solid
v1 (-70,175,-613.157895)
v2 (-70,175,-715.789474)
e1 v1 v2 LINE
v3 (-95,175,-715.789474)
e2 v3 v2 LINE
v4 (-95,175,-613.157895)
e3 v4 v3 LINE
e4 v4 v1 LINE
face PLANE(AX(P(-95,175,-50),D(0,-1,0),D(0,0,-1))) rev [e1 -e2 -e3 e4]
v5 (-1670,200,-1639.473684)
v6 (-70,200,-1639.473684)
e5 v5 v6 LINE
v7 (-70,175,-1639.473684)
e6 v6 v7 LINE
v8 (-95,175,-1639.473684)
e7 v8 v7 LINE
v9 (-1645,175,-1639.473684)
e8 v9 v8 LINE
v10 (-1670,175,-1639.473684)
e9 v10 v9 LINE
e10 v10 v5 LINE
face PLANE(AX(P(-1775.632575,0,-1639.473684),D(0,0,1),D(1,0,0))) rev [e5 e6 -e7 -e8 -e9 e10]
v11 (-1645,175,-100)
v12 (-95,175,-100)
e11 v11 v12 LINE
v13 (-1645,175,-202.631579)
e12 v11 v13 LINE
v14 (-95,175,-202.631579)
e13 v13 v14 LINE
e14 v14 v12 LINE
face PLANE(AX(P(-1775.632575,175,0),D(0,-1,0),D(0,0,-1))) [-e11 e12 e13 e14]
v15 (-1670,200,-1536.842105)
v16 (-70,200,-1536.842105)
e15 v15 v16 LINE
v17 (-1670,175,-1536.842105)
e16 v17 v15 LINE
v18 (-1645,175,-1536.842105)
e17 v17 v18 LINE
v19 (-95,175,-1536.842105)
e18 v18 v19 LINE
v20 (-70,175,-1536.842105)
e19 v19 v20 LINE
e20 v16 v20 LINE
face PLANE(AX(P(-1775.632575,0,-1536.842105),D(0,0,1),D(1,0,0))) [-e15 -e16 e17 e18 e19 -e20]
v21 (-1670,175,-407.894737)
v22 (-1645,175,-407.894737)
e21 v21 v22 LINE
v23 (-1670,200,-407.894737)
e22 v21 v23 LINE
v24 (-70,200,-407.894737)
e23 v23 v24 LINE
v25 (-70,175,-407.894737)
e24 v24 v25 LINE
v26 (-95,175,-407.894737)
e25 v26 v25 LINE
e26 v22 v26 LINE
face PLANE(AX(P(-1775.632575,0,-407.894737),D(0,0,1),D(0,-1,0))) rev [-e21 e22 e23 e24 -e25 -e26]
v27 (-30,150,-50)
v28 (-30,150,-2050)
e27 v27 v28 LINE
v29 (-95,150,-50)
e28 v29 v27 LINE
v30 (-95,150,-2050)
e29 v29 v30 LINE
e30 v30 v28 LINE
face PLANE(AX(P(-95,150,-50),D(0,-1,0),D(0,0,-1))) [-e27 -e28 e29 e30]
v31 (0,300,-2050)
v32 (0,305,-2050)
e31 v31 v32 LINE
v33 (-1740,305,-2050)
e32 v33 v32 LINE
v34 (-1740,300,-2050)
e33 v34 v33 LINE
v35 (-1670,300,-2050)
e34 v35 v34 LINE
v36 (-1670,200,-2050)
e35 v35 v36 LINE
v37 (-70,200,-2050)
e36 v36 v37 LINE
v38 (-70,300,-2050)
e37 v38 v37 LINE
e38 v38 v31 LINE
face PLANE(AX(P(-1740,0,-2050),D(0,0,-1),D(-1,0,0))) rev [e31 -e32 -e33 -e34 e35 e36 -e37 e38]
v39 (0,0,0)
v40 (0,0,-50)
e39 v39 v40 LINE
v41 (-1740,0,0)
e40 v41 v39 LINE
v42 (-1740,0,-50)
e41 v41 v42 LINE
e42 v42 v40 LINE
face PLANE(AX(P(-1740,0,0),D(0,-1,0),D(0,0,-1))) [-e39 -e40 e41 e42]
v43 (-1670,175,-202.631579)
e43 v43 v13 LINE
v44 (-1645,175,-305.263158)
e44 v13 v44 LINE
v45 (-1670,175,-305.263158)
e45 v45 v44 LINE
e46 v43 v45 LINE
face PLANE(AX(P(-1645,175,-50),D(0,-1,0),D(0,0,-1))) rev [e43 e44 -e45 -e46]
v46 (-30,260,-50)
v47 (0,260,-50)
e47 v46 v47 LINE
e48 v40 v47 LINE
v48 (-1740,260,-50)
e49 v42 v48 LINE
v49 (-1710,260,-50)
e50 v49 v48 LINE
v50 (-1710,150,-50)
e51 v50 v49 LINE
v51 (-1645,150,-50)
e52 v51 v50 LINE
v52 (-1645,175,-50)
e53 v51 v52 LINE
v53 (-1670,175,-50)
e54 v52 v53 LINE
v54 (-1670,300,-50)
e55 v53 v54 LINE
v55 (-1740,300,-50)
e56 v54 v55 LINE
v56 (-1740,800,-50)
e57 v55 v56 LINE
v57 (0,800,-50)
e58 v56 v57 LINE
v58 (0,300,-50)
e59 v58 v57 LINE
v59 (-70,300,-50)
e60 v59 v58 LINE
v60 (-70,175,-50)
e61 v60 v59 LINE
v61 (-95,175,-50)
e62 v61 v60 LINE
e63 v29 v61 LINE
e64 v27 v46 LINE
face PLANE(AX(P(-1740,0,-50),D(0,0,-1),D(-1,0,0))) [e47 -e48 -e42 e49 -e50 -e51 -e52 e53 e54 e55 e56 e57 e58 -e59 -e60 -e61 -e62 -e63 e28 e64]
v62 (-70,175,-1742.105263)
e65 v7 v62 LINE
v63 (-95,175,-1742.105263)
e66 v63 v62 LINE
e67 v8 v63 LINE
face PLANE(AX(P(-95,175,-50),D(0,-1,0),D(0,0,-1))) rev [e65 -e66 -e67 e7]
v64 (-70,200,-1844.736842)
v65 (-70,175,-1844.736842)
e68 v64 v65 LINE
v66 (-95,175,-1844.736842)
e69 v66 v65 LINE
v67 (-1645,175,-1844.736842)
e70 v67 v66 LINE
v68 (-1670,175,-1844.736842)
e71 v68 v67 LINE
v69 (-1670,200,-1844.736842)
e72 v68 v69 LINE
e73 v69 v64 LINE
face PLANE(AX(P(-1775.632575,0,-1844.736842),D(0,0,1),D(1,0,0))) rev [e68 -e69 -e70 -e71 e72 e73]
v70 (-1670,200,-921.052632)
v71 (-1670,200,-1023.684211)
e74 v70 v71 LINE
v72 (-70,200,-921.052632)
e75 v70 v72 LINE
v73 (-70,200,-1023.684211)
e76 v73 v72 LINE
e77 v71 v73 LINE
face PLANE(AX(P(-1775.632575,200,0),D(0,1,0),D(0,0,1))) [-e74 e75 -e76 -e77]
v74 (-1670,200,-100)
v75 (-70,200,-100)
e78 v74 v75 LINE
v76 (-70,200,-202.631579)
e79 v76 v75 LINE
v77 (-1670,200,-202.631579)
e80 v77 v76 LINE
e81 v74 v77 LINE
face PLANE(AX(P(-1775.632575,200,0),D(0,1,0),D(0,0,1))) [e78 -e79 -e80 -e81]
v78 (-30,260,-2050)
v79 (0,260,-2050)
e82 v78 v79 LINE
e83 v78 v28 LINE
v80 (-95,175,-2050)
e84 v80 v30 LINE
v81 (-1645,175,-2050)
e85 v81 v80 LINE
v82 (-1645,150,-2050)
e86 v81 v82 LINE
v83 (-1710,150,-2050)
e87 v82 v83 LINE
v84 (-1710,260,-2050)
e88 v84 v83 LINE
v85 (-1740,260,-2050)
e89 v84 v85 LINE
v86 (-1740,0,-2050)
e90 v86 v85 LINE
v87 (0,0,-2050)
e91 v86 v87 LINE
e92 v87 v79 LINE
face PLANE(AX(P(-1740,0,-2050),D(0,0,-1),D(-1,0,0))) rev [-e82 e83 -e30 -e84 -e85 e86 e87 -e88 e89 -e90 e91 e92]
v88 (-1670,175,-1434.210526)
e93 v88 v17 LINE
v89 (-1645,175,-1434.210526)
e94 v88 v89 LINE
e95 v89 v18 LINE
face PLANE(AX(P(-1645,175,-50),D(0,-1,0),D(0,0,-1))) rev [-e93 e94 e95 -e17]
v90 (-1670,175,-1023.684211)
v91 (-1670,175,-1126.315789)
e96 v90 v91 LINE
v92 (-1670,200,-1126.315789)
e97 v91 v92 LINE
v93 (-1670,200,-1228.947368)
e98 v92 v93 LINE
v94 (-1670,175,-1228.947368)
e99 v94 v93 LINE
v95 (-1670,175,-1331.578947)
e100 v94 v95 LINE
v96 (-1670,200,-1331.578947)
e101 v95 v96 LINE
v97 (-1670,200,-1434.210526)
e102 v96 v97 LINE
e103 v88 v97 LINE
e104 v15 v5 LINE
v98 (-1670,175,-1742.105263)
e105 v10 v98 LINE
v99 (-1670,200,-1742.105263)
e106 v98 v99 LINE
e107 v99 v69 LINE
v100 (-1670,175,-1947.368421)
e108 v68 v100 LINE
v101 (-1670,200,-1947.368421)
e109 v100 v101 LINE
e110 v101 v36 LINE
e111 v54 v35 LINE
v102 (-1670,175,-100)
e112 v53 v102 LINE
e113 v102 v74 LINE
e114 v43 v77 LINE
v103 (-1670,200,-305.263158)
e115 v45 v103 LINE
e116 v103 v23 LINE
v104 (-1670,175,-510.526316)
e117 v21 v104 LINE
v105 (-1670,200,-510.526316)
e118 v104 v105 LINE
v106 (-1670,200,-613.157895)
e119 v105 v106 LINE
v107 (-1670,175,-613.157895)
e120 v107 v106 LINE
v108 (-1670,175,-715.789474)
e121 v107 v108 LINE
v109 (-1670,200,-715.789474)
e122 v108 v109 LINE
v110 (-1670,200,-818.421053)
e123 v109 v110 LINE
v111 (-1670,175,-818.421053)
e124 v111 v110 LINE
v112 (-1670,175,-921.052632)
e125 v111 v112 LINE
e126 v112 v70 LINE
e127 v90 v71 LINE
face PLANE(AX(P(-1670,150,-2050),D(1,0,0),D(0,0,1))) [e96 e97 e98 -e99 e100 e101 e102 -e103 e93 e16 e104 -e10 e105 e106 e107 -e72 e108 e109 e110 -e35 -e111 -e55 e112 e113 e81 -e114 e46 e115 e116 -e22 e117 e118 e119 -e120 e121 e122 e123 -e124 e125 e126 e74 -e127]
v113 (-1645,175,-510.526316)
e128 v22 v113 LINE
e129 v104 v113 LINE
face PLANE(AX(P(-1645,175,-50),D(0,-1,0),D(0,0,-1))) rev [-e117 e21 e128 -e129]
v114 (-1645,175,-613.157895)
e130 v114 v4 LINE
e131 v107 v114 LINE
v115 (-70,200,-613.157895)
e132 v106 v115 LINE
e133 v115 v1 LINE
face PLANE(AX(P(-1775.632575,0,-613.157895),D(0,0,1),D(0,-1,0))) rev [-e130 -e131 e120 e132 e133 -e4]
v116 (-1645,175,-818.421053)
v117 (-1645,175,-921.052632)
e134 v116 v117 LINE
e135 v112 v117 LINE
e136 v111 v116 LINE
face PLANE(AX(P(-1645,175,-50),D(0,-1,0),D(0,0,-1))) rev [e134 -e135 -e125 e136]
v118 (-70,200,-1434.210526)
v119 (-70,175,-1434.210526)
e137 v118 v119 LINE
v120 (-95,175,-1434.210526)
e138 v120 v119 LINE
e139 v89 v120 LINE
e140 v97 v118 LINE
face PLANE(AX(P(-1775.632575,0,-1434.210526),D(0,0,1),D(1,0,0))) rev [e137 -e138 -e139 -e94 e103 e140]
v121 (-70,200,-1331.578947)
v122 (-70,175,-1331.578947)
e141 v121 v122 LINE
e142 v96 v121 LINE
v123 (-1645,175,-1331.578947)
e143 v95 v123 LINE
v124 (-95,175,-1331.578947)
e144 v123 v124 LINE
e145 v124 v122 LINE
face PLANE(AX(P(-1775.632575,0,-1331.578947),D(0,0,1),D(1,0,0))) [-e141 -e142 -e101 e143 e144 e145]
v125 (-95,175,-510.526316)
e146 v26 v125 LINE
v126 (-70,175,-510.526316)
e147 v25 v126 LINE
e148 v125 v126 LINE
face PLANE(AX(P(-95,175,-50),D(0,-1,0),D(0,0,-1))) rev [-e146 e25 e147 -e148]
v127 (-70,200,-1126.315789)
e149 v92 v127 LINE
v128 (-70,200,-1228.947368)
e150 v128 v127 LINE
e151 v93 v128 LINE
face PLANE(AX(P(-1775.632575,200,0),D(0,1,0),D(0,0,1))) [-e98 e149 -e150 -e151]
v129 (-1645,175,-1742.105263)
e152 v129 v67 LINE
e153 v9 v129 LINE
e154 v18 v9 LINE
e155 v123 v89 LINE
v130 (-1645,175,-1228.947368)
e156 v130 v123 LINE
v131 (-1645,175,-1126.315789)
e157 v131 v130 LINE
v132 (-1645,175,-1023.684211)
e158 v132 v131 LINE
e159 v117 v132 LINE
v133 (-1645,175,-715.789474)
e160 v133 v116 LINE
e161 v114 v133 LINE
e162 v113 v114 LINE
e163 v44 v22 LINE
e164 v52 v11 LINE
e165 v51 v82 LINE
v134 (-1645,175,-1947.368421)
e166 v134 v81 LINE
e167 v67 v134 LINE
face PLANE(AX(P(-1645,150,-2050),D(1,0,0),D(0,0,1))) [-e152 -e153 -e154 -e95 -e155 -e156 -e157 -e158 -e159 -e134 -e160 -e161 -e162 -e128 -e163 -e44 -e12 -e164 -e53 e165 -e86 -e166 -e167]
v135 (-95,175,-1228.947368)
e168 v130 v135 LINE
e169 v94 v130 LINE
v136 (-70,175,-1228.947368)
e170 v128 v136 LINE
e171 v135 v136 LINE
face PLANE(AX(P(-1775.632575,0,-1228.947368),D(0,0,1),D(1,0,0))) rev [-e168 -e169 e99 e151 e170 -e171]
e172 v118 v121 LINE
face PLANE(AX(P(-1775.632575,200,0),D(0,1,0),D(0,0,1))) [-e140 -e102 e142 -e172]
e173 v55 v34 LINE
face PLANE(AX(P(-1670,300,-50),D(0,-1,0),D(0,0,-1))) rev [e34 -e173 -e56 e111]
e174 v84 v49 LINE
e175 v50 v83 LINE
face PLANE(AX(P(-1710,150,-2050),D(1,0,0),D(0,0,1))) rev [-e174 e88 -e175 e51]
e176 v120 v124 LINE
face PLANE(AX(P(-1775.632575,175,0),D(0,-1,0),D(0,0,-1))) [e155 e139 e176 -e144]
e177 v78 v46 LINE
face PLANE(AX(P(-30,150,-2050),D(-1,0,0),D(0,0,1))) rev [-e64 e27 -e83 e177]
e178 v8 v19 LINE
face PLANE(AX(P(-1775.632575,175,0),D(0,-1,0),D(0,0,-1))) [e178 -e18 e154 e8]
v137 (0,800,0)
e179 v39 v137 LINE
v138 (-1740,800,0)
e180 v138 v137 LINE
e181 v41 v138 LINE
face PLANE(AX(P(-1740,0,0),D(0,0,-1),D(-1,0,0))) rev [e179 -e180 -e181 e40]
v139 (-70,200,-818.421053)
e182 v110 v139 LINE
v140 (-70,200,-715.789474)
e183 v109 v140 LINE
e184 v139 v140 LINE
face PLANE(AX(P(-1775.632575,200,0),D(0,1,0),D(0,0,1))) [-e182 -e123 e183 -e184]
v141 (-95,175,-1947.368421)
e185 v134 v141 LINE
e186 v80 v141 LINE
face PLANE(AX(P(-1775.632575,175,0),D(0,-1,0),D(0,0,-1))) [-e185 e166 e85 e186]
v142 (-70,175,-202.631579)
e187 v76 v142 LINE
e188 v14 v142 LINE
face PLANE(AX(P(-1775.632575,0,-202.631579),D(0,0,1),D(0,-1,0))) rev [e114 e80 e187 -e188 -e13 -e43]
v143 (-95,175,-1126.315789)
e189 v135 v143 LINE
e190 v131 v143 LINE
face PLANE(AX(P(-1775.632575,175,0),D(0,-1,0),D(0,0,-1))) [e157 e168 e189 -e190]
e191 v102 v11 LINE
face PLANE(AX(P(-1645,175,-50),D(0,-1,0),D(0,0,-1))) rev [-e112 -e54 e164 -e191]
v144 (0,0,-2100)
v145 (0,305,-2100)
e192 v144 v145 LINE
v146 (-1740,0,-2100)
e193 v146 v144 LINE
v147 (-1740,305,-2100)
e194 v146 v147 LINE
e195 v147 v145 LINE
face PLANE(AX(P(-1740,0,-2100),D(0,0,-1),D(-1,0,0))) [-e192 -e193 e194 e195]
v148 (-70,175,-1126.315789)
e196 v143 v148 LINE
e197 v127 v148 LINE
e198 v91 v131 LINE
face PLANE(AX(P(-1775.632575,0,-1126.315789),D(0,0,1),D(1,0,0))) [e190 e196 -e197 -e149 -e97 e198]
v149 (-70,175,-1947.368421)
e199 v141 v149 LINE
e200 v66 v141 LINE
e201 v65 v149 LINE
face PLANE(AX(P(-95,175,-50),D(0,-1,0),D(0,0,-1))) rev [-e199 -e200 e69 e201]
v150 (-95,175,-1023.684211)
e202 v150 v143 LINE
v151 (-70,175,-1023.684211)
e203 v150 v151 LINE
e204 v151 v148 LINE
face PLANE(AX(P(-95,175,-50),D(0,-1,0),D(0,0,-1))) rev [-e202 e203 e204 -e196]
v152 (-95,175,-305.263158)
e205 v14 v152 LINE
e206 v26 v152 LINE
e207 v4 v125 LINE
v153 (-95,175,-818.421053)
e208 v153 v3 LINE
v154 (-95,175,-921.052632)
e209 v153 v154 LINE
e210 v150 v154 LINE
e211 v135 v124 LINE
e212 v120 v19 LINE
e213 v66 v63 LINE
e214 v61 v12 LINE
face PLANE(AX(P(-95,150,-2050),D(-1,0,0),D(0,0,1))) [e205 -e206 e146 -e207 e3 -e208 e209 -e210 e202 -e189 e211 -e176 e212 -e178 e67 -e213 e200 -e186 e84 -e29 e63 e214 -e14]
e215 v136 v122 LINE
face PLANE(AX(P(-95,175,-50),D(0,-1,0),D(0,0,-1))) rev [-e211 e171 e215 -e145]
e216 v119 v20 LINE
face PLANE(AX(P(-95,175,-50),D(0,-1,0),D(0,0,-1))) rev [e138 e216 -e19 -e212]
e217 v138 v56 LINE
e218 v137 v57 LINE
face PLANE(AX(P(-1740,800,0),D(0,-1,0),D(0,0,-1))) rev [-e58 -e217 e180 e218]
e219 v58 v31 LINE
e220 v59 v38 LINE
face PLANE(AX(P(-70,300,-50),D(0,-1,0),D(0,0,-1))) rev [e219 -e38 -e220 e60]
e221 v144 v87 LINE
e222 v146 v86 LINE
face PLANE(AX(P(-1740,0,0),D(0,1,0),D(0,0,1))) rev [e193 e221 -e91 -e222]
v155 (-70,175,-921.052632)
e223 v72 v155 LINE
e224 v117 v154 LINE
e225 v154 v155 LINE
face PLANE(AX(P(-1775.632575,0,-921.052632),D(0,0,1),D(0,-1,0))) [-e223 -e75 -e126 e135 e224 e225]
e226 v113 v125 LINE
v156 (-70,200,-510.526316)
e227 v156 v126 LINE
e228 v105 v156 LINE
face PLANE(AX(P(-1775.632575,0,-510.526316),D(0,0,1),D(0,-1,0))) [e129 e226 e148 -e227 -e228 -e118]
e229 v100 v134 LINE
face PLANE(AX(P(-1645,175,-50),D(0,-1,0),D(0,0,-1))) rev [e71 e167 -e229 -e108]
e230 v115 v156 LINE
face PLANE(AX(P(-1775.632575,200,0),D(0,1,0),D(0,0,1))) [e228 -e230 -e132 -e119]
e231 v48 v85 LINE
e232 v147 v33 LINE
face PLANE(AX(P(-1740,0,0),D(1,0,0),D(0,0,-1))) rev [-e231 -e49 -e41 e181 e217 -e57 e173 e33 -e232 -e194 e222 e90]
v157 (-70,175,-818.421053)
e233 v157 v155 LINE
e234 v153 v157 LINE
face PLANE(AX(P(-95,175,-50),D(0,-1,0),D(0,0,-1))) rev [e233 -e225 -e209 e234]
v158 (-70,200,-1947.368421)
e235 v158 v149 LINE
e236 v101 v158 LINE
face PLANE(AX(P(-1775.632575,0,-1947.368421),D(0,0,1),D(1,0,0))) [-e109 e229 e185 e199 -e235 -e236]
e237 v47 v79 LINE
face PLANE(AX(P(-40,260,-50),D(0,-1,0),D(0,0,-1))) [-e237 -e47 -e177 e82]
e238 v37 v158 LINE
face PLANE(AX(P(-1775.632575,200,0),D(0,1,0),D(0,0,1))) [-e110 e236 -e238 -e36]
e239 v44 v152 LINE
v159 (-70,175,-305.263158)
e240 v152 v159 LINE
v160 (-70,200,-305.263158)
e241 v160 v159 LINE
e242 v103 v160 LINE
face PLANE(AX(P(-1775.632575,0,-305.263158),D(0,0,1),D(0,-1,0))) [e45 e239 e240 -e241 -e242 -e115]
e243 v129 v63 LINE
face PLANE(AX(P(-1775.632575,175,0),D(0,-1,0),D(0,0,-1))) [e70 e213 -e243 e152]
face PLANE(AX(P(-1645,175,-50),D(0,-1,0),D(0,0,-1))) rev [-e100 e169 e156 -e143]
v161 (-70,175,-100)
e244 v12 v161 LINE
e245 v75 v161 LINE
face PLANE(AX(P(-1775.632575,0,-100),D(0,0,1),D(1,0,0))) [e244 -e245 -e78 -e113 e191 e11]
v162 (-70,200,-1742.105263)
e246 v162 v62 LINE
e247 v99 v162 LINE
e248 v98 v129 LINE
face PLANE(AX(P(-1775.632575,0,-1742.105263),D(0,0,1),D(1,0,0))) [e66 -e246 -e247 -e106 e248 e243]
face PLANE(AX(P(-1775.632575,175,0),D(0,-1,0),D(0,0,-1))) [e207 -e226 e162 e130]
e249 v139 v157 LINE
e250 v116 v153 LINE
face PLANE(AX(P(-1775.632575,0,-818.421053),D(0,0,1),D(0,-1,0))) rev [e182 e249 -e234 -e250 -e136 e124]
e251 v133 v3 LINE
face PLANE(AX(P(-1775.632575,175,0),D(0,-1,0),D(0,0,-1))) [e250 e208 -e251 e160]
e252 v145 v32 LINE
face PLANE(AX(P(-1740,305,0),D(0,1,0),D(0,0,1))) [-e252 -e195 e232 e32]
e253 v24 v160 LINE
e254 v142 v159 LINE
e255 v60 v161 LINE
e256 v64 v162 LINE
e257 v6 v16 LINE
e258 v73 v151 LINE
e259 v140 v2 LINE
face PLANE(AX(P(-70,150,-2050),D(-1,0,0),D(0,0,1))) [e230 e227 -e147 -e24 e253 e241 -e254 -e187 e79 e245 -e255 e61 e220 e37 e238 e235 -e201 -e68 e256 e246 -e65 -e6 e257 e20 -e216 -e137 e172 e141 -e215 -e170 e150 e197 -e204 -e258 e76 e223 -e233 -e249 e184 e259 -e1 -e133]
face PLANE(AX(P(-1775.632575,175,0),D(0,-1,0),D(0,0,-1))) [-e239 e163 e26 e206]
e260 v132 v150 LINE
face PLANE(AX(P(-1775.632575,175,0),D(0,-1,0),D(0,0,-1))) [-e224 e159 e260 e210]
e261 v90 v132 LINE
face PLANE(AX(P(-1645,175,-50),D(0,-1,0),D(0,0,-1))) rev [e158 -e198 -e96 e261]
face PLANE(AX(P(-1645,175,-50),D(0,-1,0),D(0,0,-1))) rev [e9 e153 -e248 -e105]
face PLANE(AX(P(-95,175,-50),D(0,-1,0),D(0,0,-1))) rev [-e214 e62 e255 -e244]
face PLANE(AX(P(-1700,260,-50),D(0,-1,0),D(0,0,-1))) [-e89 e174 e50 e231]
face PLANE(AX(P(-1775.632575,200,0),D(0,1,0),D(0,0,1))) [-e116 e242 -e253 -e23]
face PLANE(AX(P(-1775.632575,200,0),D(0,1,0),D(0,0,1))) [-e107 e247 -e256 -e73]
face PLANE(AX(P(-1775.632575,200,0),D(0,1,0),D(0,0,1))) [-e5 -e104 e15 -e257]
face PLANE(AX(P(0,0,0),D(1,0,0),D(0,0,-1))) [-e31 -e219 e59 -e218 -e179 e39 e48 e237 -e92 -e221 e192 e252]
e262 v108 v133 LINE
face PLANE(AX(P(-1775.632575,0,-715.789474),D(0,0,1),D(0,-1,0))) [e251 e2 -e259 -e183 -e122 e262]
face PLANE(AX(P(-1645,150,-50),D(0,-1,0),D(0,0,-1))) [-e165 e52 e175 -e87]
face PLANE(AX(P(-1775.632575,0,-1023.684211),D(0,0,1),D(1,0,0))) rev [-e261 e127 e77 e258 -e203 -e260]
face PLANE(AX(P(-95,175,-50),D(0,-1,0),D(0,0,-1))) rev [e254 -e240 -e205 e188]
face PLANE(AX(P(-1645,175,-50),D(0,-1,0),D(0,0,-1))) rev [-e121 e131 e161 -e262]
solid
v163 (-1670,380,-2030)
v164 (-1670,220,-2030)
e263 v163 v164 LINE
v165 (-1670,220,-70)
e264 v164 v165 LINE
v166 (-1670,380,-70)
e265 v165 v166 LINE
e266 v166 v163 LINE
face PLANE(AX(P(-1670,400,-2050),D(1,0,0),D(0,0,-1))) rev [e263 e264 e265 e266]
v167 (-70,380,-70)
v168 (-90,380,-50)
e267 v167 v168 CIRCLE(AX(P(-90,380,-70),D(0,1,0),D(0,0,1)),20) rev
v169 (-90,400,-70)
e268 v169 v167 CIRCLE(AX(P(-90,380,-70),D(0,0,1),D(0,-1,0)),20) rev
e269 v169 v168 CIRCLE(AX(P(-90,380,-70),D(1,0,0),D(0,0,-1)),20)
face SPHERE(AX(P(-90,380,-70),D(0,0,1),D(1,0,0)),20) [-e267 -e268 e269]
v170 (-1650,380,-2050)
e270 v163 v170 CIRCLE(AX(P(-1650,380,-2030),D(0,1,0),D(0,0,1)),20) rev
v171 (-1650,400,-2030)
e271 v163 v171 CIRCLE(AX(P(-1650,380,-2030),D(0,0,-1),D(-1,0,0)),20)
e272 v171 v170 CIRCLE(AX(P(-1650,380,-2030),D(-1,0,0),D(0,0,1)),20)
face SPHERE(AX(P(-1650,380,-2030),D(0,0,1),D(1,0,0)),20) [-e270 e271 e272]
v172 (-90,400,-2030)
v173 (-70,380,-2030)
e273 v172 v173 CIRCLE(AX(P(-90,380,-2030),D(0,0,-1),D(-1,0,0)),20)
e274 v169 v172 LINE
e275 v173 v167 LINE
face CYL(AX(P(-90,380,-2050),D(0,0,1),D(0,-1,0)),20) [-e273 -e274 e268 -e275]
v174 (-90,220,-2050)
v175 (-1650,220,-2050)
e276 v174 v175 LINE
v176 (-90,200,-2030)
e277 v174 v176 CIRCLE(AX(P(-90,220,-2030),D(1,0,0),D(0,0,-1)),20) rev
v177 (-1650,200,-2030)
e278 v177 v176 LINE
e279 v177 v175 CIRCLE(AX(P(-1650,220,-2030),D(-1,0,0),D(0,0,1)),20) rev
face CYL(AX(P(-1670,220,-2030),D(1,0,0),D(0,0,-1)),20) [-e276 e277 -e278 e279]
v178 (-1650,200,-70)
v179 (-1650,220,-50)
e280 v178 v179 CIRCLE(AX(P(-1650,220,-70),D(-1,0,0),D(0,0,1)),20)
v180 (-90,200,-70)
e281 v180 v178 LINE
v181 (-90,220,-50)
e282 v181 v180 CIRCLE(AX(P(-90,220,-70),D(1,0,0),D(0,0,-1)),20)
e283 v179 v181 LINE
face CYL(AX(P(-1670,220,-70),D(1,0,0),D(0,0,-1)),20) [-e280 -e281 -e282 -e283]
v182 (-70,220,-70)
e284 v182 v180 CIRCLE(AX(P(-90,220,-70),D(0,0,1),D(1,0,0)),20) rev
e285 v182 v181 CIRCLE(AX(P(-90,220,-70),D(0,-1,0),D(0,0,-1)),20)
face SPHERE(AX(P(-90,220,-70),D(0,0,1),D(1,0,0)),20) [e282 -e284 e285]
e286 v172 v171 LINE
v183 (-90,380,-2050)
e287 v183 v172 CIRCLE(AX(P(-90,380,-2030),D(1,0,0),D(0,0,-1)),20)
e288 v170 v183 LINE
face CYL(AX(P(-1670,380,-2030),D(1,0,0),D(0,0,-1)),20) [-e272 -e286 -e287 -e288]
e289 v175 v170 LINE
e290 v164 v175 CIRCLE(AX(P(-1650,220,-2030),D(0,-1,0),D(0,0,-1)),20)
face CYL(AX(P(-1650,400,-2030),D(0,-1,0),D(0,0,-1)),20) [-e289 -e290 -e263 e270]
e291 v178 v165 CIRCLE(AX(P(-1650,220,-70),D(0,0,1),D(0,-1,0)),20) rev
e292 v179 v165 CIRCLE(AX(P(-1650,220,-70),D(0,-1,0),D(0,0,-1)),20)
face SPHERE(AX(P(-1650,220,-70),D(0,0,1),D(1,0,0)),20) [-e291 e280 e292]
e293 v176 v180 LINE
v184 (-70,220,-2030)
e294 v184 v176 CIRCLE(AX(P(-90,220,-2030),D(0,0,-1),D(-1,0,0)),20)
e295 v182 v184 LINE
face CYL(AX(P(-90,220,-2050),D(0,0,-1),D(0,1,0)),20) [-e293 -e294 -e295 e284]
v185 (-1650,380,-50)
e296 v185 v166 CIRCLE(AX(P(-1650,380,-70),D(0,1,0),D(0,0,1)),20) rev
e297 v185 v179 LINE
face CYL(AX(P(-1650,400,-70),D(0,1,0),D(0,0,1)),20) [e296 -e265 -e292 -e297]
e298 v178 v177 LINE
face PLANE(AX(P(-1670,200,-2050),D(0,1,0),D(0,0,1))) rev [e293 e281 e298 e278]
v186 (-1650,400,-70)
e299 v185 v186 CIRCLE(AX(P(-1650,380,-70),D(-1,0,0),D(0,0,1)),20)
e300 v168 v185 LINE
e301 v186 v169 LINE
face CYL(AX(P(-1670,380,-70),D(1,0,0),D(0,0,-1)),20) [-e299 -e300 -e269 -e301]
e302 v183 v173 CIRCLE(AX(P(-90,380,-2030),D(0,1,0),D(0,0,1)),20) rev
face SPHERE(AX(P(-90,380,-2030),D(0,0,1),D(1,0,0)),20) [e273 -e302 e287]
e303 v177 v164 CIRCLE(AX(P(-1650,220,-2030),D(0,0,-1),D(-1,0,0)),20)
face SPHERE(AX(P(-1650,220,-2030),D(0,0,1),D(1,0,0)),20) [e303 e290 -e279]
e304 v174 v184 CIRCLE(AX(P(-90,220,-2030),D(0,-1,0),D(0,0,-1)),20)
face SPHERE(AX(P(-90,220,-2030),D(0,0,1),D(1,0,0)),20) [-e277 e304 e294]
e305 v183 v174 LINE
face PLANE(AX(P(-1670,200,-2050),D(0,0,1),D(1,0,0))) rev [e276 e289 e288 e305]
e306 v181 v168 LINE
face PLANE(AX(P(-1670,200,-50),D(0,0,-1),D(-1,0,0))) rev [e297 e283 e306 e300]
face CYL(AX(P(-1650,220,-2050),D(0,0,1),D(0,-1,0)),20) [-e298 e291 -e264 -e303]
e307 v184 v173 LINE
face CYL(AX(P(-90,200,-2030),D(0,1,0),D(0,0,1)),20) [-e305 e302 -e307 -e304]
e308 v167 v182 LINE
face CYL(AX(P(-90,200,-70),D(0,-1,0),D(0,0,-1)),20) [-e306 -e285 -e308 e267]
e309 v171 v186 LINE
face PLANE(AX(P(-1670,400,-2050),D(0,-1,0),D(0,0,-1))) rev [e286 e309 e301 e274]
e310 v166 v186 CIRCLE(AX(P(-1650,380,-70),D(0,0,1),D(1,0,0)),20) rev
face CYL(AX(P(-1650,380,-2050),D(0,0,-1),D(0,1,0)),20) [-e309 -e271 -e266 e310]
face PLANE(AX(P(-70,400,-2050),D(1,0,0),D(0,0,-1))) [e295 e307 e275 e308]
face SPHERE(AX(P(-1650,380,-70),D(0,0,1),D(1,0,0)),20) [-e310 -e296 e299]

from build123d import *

# Parameters (mm, degrees)
BEDSKETCH_W                        = 50
BEDSKETCH_H                        = 800
BEDHEADERSBOSS_EXTRUDE_DEPTH       = 1740
BEDSKETCH_H_2                      = 305
BEDHEADERSBOSS_EXTRUDE_2_DEPTH     = 1740
BEAMEXTRUDE_THIN_START             = -30
BEDSKETCH_7_W                      = 2000
BEDSKETCH_7_H                      = 150
BEAMEXTRUDE_THIN_DEPTH             = 40
BEDSKETCH_8_W                      = 2000
BEDSKETCH_8_H                      = 40
BEAMTOPEXTRUDE_THIN_DEPTH          = 40
SLATESUPPORTEXTRUDE_THIN_START     = -95
SLATESUPPORTEXTRUDE_THIN_OUTLINE_W = 2000
SLATESUPPORTEXTRUDE_THIN_OUTLINE_H = 25
SLATESUPPORTEXTRUDE_THIN_DEPTH     = 25
SLATESBOSS_EXTRUDE_START           = -70
BEDSKETCH_11_W                     = 102.631578947
BEDSKETCH_11_H                     = 25
SLATESBOSS_EXTRUDE_DEPTH           = 1600
MATTRESSSKETCH_W                   = 2000
MATTRESSSKETCH_H                   = 200
MATTRESSBOSS_EXTRUDE_DEPTH         = 1600
MATTRESSFILLET_R                   = 20


# Read off the part's stored shape, not the designer's step: SlateSupportExtrude-Thin
with BuildPart() as part:
    # BedSketch → BedHeadersBoss-Extrude (new body)
    with BuildSketch(Plane(origin=(0, 0, 0), x_dir=(0, 0, -1), z_dir=(1, 0, 0))):
        with Locations((25, 400)):
            Rectangle(BEDSKETCH_W, BEDSKETCH_H)
    extrude(amount=-BEDHEADERSBOSS_EXTRUDE_DEPTH)



with BuildPart() as body_2:
    # BedSketch → BedHeadersBoss-Extrude 2 (new body)
    with BuildSketch(Plane(origin=(0, 0, 0), x_dir=(0, 0, -1), z_dir=(1, 0, 0))):
        with Locations((2075, 152.5)):
            Rectangle(BEDSKETCH_W, BEDSKETCH_H_2)
    extrude(amount=-BEDHEADERSBOSS_EXTRUDE_2_DEPTH)


with BuildPart() as body_3:
    # BedSketch<7> → BeamExtrude-Thin (new body)
    with BuildSketch(Plane(origin=(0, 0, 0), x_dir=(0, 0, -1), z_dir=(1, 0, 0)).offset(BEAMEXTRUDE_THIN_START)):
        with Locations((1050, 225)):
            Rectangle(BEDSKETCH_7_W, BEDSKETCH_7_H)
    extrude(amount=-BEAMEXTRUDE_THIN_DEPTH)

    # BedSketch<8> → BeamTopExtrude-Thin (add)
    with BuildSketch(Plane(origin=(0, 0, 0), x_dir=(0, 0, -1), z_dir=(1, 0, 0))):
        with Locations((1050, 280)):
            Rectangle(BEDSKETCH_8_W, BEDSKETCH_8_H)
    extrude(amount=-BEAMTOPEXTRUDE_THIN_DEPTH)


with BuildPart() as part_1:
    add(part.part)

    add(body_2.part)  # SlateSupportExtrude-Thin merges body 2

    add(body_3.part)  # SlateSupportExtrude-Thin merges body 3
    # SlateSupportExtrude-Thin outline → SlateSupportExtrude-Thin (add)
    with BuildSketch(Plane(origin=(0, 0, 0), x_dir=(0, 0, -1), z_dir=(1, 0, 0)).offset(SLATESUPPORTEXTRUDE_THIN_START)):
        with Locations((1050, 162.5)):
            Rectangle(SLATESUPPORTEXTRUDE_THIN_OUTLINE_W, SLATESUPPORTEXTRUDE_THIN_OUTLINE_H)
    extrude(amount=SLATESUPPORTEXTRUDE_THIN_DEPTH)

    # BeamMirror: part across plane


with BuildPart() as part_2:
    add(part_1.part)
    add(part_1.part.mirror(Plane(origin=(-870, 0, 0), x_dir=(0, 0, 1), z_dir=(1, 0, 0))))

    # BedSketch<11> → SlatesBoss-Extrude (add)
    with BuildSketch(Plane(origin=(0, 0, 0), x_dir=(0, 0, -1), z_dir=(1, 0, 0)).offset(SLATESBOSS_EXTRUDE_START)):
        with Locations((151.315789473, 187.5)):
            Rectangle(BEDSKETCH_11_W, BEDSKETCH_11_H)
        Polygon((305.263157895, 200), (305.263157895, 175), (407.894736842, 175), (407.894736842, 200), (357.894736842, 200), align=None)
        Polygon((510.526315789, 200), (510.526315789, 175), (613.157894737, 175), (613.157894737, 200), (563.157894737, 200), align=None)
        Polygon((715.789473684, 200), (715.789473684, 175), (818.421052632, 175), (818.421052632, 200), (768.421052632, 200), align=None)
        Polygon((921.052631579, 200), (921.052631579, 175), (1023.684210526, 175), (1023.684210526, 200), (973.684210526, 200), align=None)
        Polygon((1126.315789474, 200), (1126.315789474, 175), (1228.947368421, 175), (1228.947368421, 200), (1178.947368421, 200), align=None)
        Polygon((1331.578947368, 175), (1434.210526316, 175), (1434.210526316, 200), (1384.210526316, 200), (1331.578947368, 200), align=None)
        Polygon((1536.842105263, 175), (1639.473684211, 175), (1639.473684211, 200), (1589.473684211, 200), (1536.842105263, 200), align=None)
        Polygon((1742.105263158, 175), (1844.736842105, 175), (1844.736842105, 200), (1794.736842105, 200), (1742.105263158, 200), align=None)
        Polygon((2050, 175), (2050, 200), (2000, 200), (1947.368421053, 200), (1947.368421053, 175), align=None)
    extrude(amount=-SLATESBOSS_EXTRUDE_DEPTH)


with BuildPart() as body_2_2:
    # MattressSketch → MattressBoss-Extrude (new body)
    with BuildSketch(Plane.ZY.offset(70)):
        with Locations((-1050, 300)):
            Rectangle(MATTRESSSKETCH_W, MATTRESSSKETCH_H)
    extrude(amount=MATTRESSBOSS_EXTRUDE_DEPTH)

    # MattressFillet
    mattressfillet_edges = [body_2_2.edges().sort_by_distance(p)[0] for p in [
        (-1670, 300, -50),
        (-1670, 400, -1050),
        (-1670, 300, -2050),
        (-70, 400, -1050),
        (-70, 300, -50),
        (-70, 200, -1050),
        (-70, 300, -2050),
        (-1670, 200, -1050),
        (-870, 400, -2050),
        (-870, 400, -50),
        (-870, 200, -50),
        (-870, 200, -2050),
    ]]
    fillet(mattressfillet_edges, radius=MATTRESSFILLET_R)


solid = Compound([part_2.part, body_2_2.part])
